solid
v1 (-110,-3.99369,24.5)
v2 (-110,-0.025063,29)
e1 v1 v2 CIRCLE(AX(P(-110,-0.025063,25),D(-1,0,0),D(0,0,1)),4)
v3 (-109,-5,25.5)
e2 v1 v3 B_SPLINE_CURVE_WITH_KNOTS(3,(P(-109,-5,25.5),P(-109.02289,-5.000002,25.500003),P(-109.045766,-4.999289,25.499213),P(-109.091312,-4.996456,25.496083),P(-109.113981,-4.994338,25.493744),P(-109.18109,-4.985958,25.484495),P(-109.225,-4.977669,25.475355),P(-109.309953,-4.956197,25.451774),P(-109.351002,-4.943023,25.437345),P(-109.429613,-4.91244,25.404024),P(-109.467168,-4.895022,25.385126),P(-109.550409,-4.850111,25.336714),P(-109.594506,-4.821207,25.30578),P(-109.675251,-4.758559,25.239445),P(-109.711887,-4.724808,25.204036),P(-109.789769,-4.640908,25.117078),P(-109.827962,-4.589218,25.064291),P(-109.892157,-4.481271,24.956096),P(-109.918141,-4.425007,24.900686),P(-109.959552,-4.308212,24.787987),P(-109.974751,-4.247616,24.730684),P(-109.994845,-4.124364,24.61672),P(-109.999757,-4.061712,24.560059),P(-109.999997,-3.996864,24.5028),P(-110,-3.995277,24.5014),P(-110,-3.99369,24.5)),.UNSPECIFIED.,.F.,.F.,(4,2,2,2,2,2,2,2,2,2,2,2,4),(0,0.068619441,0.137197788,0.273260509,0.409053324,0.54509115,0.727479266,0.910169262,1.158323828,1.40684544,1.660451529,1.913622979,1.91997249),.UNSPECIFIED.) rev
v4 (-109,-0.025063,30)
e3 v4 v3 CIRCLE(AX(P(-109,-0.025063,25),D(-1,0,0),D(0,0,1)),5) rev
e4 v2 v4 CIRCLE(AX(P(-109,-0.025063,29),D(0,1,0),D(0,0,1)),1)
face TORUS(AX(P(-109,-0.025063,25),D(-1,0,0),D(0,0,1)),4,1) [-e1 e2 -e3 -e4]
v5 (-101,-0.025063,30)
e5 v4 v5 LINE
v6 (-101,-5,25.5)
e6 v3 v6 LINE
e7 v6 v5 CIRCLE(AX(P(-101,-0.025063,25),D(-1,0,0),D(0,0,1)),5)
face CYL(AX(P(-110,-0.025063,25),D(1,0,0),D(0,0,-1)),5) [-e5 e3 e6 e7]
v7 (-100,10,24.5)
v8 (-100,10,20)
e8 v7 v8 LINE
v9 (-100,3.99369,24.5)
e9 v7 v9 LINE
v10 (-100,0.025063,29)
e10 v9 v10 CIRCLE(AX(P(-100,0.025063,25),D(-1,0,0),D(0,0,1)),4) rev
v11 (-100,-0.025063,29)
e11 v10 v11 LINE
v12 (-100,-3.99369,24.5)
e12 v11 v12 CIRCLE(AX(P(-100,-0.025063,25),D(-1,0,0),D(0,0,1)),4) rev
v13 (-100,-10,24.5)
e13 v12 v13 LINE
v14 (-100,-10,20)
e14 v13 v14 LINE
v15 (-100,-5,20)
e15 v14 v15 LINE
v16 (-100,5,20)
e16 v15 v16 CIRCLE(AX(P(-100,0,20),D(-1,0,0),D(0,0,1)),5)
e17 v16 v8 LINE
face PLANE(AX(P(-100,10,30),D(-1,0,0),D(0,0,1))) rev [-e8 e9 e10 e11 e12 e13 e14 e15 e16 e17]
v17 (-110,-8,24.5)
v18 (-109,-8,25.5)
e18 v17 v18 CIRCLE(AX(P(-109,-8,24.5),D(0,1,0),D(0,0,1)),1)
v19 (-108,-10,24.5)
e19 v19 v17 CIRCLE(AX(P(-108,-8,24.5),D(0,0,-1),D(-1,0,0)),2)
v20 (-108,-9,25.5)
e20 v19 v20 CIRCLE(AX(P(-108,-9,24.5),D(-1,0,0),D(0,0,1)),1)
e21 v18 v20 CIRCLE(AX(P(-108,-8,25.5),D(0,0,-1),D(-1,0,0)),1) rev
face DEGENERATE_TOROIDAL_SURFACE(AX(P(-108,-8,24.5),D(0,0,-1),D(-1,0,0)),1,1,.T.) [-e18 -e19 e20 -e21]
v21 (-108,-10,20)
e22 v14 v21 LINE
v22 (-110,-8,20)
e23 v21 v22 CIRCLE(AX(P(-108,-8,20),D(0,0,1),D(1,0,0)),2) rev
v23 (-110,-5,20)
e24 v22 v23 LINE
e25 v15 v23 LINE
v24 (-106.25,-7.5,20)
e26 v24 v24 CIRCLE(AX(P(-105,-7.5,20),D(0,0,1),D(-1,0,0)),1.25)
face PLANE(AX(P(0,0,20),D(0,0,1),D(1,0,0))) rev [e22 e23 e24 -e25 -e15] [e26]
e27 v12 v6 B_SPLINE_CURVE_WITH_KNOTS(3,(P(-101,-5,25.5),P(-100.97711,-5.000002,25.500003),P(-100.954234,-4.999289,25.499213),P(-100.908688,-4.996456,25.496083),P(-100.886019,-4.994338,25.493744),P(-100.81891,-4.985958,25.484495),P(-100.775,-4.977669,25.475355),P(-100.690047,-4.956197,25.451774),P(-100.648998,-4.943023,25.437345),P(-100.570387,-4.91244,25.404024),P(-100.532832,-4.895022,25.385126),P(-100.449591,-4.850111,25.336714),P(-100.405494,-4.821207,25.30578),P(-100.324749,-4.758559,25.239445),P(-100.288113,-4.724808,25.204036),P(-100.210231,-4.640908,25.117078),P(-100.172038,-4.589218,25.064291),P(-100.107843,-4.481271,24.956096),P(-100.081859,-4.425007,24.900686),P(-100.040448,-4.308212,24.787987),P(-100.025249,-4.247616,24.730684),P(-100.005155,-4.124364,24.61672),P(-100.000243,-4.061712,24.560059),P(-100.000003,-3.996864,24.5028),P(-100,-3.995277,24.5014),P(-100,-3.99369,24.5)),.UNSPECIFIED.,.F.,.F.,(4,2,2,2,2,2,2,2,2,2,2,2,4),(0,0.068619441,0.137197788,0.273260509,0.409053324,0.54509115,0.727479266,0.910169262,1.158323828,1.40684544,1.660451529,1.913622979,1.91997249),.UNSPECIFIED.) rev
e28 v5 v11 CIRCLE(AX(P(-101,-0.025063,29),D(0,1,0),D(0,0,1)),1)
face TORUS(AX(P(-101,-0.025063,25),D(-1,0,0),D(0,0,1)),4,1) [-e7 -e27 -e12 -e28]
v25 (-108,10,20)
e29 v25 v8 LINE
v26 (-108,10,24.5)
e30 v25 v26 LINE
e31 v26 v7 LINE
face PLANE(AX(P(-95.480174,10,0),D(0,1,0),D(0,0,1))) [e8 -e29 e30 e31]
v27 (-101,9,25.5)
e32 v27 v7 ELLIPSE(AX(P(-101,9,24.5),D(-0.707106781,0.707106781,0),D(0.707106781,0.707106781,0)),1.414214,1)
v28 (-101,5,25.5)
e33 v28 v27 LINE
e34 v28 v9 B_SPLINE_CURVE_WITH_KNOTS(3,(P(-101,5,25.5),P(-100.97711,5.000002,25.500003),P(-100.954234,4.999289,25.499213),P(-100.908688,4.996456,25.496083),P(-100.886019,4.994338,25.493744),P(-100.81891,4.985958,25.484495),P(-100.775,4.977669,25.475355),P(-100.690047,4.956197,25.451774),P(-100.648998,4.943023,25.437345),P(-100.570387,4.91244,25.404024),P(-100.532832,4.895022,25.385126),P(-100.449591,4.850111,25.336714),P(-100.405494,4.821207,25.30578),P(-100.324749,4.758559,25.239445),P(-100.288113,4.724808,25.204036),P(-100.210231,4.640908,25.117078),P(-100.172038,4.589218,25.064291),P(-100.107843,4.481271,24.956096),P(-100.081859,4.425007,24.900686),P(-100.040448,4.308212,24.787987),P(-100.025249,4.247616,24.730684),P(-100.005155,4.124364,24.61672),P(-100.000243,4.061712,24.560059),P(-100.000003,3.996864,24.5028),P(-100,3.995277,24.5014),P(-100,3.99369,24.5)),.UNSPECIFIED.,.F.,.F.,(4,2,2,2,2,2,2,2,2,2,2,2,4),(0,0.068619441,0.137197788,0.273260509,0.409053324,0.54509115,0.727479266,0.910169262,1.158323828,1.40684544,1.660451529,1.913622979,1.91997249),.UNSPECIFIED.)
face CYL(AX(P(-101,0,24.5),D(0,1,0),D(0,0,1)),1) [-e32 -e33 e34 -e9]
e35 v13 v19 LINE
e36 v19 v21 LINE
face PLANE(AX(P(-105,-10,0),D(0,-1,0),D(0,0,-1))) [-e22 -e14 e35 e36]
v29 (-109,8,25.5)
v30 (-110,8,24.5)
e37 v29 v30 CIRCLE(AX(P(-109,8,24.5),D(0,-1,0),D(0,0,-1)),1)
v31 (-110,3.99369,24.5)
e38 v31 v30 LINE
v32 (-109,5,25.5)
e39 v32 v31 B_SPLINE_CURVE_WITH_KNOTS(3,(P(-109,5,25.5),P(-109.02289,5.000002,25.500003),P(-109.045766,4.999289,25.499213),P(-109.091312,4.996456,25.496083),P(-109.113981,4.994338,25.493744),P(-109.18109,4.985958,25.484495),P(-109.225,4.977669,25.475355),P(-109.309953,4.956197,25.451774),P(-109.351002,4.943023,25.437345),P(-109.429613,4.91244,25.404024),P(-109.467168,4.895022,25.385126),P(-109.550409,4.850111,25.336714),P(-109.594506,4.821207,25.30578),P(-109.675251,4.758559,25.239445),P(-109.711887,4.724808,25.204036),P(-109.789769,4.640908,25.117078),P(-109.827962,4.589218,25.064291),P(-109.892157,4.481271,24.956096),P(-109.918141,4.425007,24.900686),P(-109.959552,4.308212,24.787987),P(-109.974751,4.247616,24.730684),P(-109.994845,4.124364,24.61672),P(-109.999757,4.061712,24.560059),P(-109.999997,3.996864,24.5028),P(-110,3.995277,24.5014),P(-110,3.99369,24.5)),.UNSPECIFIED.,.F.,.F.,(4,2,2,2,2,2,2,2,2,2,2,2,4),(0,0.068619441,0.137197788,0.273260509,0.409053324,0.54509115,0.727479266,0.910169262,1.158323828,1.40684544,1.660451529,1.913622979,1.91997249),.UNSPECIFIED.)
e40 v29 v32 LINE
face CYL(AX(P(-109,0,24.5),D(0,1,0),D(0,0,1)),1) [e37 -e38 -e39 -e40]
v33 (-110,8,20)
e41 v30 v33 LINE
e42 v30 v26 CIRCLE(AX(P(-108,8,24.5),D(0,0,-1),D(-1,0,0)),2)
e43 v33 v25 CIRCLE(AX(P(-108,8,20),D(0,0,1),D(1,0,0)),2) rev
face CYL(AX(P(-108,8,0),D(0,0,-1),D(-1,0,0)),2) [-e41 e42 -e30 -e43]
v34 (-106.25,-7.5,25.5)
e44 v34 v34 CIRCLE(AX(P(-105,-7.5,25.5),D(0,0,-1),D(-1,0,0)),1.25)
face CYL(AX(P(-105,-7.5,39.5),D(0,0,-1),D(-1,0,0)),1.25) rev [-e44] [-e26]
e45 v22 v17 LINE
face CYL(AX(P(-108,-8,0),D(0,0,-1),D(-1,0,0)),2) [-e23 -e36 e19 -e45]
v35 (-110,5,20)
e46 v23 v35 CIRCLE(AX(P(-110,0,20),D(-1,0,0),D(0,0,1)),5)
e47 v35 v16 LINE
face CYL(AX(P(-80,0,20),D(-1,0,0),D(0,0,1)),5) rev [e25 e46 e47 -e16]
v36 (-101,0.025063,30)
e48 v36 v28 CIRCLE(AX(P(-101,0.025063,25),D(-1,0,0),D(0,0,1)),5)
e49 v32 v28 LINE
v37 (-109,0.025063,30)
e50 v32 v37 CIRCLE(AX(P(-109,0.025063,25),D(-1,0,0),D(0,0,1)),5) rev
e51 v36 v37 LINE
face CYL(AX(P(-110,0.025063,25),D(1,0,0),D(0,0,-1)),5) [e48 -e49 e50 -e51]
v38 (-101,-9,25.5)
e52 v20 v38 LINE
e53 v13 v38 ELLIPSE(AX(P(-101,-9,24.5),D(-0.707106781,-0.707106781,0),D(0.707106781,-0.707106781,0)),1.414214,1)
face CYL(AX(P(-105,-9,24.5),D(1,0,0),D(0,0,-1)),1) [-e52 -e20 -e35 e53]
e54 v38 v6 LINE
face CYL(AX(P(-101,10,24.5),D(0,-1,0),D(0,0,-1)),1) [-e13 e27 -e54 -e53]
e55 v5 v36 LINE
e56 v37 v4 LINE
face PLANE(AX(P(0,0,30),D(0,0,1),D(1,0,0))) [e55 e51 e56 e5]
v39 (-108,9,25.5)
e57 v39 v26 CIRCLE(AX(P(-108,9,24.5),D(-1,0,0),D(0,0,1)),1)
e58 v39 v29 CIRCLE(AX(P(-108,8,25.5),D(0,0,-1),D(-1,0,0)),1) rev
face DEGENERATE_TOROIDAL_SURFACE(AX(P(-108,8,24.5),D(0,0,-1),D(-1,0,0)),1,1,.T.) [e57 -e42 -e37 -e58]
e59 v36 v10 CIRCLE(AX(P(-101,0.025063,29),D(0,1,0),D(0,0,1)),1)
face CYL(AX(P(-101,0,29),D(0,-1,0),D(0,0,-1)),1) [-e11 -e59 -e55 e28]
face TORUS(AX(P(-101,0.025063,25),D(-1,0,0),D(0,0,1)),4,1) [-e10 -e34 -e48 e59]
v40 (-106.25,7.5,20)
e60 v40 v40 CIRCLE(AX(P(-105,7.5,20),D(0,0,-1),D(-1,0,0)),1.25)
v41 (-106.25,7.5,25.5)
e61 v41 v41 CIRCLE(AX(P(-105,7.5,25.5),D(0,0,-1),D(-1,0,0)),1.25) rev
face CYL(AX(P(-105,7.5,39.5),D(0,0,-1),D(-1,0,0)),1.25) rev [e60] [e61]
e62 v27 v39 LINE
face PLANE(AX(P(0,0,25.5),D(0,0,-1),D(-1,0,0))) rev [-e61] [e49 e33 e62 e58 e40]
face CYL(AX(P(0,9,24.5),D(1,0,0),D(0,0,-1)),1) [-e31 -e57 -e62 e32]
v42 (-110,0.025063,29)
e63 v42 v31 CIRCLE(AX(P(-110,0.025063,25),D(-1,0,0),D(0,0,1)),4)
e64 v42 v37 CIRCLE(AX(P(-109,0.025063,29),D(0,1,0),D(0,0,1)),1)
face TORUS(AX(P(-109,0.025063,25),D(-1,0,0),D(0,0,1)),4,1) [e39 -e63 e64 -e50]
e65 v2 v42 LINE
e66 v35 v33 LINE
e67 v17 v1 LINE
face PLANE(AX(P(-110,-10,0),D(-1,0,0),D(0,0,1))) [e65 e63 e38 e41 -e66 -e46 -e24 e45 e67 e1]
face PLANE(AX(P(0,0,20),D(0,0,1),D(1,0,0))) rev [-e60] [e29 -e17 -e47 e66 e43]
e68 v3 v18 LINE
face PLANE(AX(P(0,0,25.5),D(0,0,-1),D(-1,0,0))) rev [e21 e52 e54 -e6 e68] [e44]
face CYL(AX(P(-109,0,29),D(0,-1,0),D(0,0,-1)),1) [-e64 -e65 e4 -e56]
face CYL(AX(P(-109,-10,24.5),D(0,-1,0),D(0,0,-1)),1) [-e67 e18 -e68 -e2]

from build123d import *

# Parameters (mm, degrees)
SKETCH3_R                 = 2.75
BOSS_EXTRUDE1_DEPTH       = 6
BOSS_EXTRUDE1_2_DEPTH     = 6
BOSS_EXTRUDE1_3_DEPTH     = 6
BOSS_EXTRUDE1_4_DEPTH     = 6
SKETCH4_W                 = 43
SKETCH4_H                 = 86
BOSS_EXTRUDE2_DEPTH       = 2.5
SKETCH5_R                 = 2.75
BOSS_EXTRUDE3_DEPTH       = 10
LPATTERN1_COUNT           = 2
LPATTERN1_PITCH           = 37
LPATTERN2_COUNT           = 2
LPATTERN2_PITCH           = 37
LPATTERN2_COPY_1_SKETCH_R = 2.75
LPATTERN2_COPY_1_DEPTH    = 10
SKETCH6_W                 = 87
SKETCH6_H                 = 86
BOSS_EXTRUDE4_DEPTH       = 2.5
BOSS_EXTRUDE5_DEPTH       = 2
SKETCH12_W                = 4
SKETCH12_H                = 8
CUT_EXTRUDE1_DEPTH        = 4
SKETCH14_R                = 0.85
CUT_EXTRUDE2_DEPTH        = 4.5
LPATTERN3_COUNT           = 2
LPATTERN3_PITCH           = 46.5
BOSS_EXTRUDE6_DEPTH       = 35
SKETCH18_W                = 2
SKETCH18_H                = 35
BOSS_EXTRUDE7_DEPTH       = 18.5
SKETCH19_W                = 32.48
SKETCH19_H                = 17.04
BOSS_EXTRUDE8_DEPTH       = 10
SKETCH20_W                = 8.16
SKETCH20_H                = 13.04
CUT_EXTRUDE3_DEPTH        = 10
SKETCH21_W                = 1.1
SKETCH21_H                = 86
CUT_EXTRUDE4_DEPTH        = 10
FILLET2_R                 = 2
FILLET4_R                 = 20
BOSS_EXTRUDE9_DEPTH       = 2.5
SKETCH24_W                = 10
SKETCH24_H                = 20
BOSS_EXTRUDE10_DEPTH      = 30
SKETCH25_R                = 5
CUT_EXTRUDE6_DEPTH        = 30
FILLET6_R                 = 10
FILLET8_R                 = 2
SKETCH27_W                = 20
SKETCH27_H                = 20.130693805
CUT_EXTRUDE7_DEPTH        = 22.5
CUT_EXTRUDE10_DEPTH       = 7.5
CUT_EXTRUDE10_DEPTH_BACK  = 210.5
SKETCH28_W                = 79.126815109
SKETCH28_H                = 112.332596714
SKETCH29_R                = 1.25
CUT_EXTRUDE11_DEPTH       = 19.5
SKETCH30_W                = 10
SKETCH30_H                = 5
CUT_EXTRUDE12_DEPTH       = 4.5
FILLET9_R                 = 5
FILLET9_OF_MIRROR5_R      = 5
FILLET11_R                = 1


with BuildPart() as part:
    # Sketch3 → Boss-Extrude1 (new body)
    with BuildSketch(Plane.XY):
        with Locations((-25, -3)):
            Circle(SKETCH3_R)
    boss_extrude1 = extrude(amount=BOSS_EXTRUDE1_DEPTH)



with BuildPart() as body_2:
    # Sketch3 → Boss-Extrude1 2 (new body)
    with BuildSketch(Plane.XY):
        with Locations((-62, -3)):
            Circle(SKETCH3_R)
    boss_extrude1_2 = extrude(amount=BOSS_EXTRUDE1_2_DEPTH)


with BuildPart() as body_3:
    # Sketch3 → Boss-Extrude1 3 (new body)
    with BuildSketch(Plane.XY):
        with Locations(Location((-25, -40, 0), (0, 0, 180))):
            Circle(SKETCH3_R)
    boss_extrude1_3 = extrude(amount=BOSS_EXTRUDE1_3_DEPTH)


with BuildPart() as body_4:
    # Sketch3 → Boss-Extrude1 4 (new body)
    with BuildSketch(Plane.XY):
        with Locations(Location((-62, -40, 0), (0, 0, 180))):
            Circle(SKETCH3_R)
    boss_extrude1_4 = extrude(amount=BOSS_EXTRUDE1_4_DEPTH)


with BuildPart() as part_1:
    add(part.part)

    add(body_2.part)  # Boss-Extrude2 merges body 2

    add(body_3.part)  # Boss-Extrude2 merges body 3

    add(body_4.part)  # Boss-Extrude2 merges body 4
    # Sketch4 → Boss-Extrude2 (add)
    with BuildSketch(Plane.XY):
        with Locations((-43.5, 0)):
            Rectangle(SKETCH4_W, SKETCH4_H)
    extrude(amount=-BOSS_EXTRUDE2_DEPTH)

    # Mirror4: Boss-Extrude1, Boss-Extrude1 2, Boss-Extrude1 3, Boss-Extrude1 4 across plane
    add(boss_extrude1.mirror(Plane.ZX))
    add(boss_extrude1_2.mirror(Plane.ZX))
    add(boss_extrude1_3.mirror(Plane.ZX))
    add(boss_extrude1_4.mirror(Plane.ZX))

    # Sketch5 → Boss-Extrude3 (add)
    with BuildSketch(Plane.XY.offset(6)):
        with Locations((-25, 40)):
            Circle(SKETCH5_R)
    boss_extrude3 = extrude(amount=BOSS_EXTRUDE3_DEPTH)

    # LPattern1: Boss-Extrude3 ×2
    with Locations(*[(-i * LPATTERN1_PITCH, 0, 0) for i in range(1, LPATTERN1_COUNT)]):
        add(boss_extrude3)

    # LPattern2: Boss-Extrude3 ×2
    with Locations(*[(0, -i * LPATTERN2_PITCH, 0) for i in range(1, LPATTERN2_COUNT)]):
        add(boss_extrude3)

    # LPattern2 copy 1 sketch → LPattern2 copy 1 (add)
    with BuildSketch(Plane(origin=(-37, -37, 6), x_dir=(1, 0, 0), z_dir=(0, 0, 1))):
        with Locations((-25, 40)):
            Circle(LPATTERN2_COPY_1_SKETCH_R)
    extrude(amount=LPATTERN2_COPY_1_DEPTH)

    # Sketch6 → Boss-Extrude4 (add)
    with BuildSketch(Plane.XY):
        with Locations((21.5, 0)):
            Rectangle(SKETCH6_W, SKETCH6_H)
    extrude(amount=-BOSS_EXTRUDE4_DEPTH)

    # Sketch11 → Boss-Extrude5 (add, symmetric)
    with BuildSketch(Plane(origin=(-6, 0, 0), x_dir=(0, 0, -1), z_dir=(1, 0, 0))):
        Polygon((0, -43), (-40, -43), (-40, -39), (0, -18), align=None)
    boss_extrude5 = extrude(amount=BOSS_EXTRUDE5_DEPTH, both=True)

    # Sketch12 → Cut-Extrude1 (cut)
    with BuildSketch(Plane.ZY.offset(8)):
        with Locations((8, -32)):
            Rectangle(SKETCH12_W, SKETCH12_H)
    extrude(amount=-CUT_EXTRUDE1_DEPTH, mode=Mode.SUBTRACT)

    # Sketch14 → Cut-Extrude2 (cut)
    with BuildSketch(Plane.XZ.offset(43)):
        with Locations(Location((-6, 37, 0), (0, 0, 270))):
            Circle(SKETCH14_R)
        with Locations(Location((-6, 13.6, 0), (0, 0, 270))):
            Circle(SKETCH14_R)
    cut_extrude2 = extrude(amount=-CUT_EXTRUDE2_DEPTH, mode=Mode.SUBTRACT)

    # LPattern3: Boss-Extrude5, Cut-Extrude2 ×2
    with Locations(*[(i * LPATTERN3_PITCH, 0, 0) for i in range(1, LPATTERN3_COUNT)]):
        add(boss_extrude5)
        add(cut_extrude2, mode=Mode.SUBTRACT)

    # Sketch17 → Boss-Extrude6 (add)
    with BuildSketch(Plane.XY):
        Polygon((42.5, -41), (42.5, -43), (63.9, -43), (63.9, 25.4), (40.5, 25.4), (40.5, -18), (42.5, -18), (42.5, 23.4), (61.9, 23.4), (61.9, -41), align=None)
    extrude(amount=BOSS_EXTRUDE6_DEPTH)

    # Sketch18 → Boss-Extrude7 (add)
    with BuildSketch(Plane.XZ.offset(18)):
        with Locations((41.5, 17.5)):
            Rectangle(SKETCH18_W, SKETCH18_H)
    extrude(amount=BOSS_EXTRUDE7_DEPTH)

    # Sketch19 → Boss-Extrude8 (add)
    with BuildSketch(Plane.XY):
        with Locations((16.24, 8.52)):
            Rectangle(SKETCH19_W, SKETCH19_H)
    extrude(amount=BOSS_EXTRUDE8_DEPTH)

    # Sketch20 → Cut-Extrude3 (cut)
    with BuildSketch(Plane.XY.offset(10)):
        with Locations((6.08, 8.52)):
            Rectangle(SKETCH20_W, SKETCH20_H)
        with Locations((16.24, 8.52)):
            Rectangle(SKETCH20_W, SKETCH20_H)
        with Locations((26.4, 8.52)):
            Rectangle(SKETCH20_W, SKETCH20_H)
    extrude(amount=-CUT_EXTRUDE3_DEPTH, mode=Mode.SUBTRACT)

    # Sketch21 → Cut-Extrude4 (cut)
    with BuildSketch(Plane.XY):
        with Locations((64.45, 0)):
            Rectangle(SKETCH21_W, SKETCH21_H)
    extrude(amount=-CUT_EXTRUDE4_DEPTH, mode=Mode.SUBTRACT)

    # Fillet2
    fillet2_edges = [part_1.edges().sort_by_distance(p)[0] for p in [
        (63.9, -43, 16.25),
        (63.9, 25.4, 17.5),
        (-65, -43, -1.25),
        (-65, 43, -1.25),
    ]]
    fillet(fillet2_edges, radius=FILLET2_R)

    # Fillet4
    fillet4_edges = [part_1.edges().sort_by_distance(p)[0] for p in [
        (63.9, 43, -1.25),
    ]]
    fillet(fillet4_edges, radius=FILLET4_R)

    # Sketch23 → Boss-Extrude9 (add)
    with BuildSketch(Plane(origin=(0, 0, -2.5), x_dir=(-1, 0, 0), z_dir=(0, 0, -1))):
        with BuildLine():
            Line((95.480174176, -10), (105, -10))
            Line((105, -10), (110, -10))
            Line((110, -10), (110, 10))
            Line((110, 10), (105, 10))
            Line((105, 10), (95.480174176, 10))
            add(Edge.make_bspline(
                [(95.480174176, 10), (68.262963787, 8.86232235), (65, 41)],
                knots=[0, 0, 0, 1, 1, 1], degree=2))
            Line((65, 41), (65, -41))
            add(Edge.make_bspline(
                [(95.480174176, -10), (68.262963787, -8.86232235), (65, -41)],
                knots=[0, 0, 0, 1, 1, 1], degree=2))
        make_face()
    extrude(amount=-BOSS_EXTRUDE9_DEPTH)

    # Sketch24 → Boss-Extrude10 (add)
    with BuildSketch(Plane.XY):
        with Locations((-105, 0)):
            Rectangle(SKETCH24_W, SKETCH24_H)
    extrude(amount=BOSS_EXTRUDE10_DEPTH)

    # Sketch25 → Cut-Extrude6 (cut)
    with BuildSketch(Plane.ZY.offset(110)):
        with Locations((20, 0)):
            Circle(SKETCH25_R)
    extrude(amount=-CUT_EXTRUDE6_DEPTH, mode=Mode.SUBTRACT)

    # Fillet6
    fillet6_edges = [part_1.edges().sort_by_distance(p)[0] for p in [
        (-100, 0, 0),
    ]]
    fillet(fillet6_edges, radius=FILLET6_R)

    # Fillet8
    fillet8_edges = [part_1.edges().sort_by_distance(p)[0] for p in [
        (-110, 10, 15),
        (-110, -10, 15),
    ]]
    fillet(fillet8_edges, radius=FILLET8_R)

    # Sketch27 → Cut-Extrude7 (cut)
    with BuildSketch(Plane(origin=(0, 0, -2.5), x_dir=(-1, 0, 0), z_dir=(0, 0, -1))):
        with Locations((100, -0.065346902)):
            Rectangle(SKETCH27_W, SKETCH27_H)
    extrude(amount=-CUT_EXTRUDE7_DEPTH, mode=Mode.SUBTRACT)


with BuildPart() as cut_extrude7_piece_1:
    # of the separate pieces the step leaves, piece 1, a body of its own (cut_extrude7_pieces)
    add(part_1.part.solids().sort_by_distance((-90, -10.130693805, -2.5))[0])

    # Sketch28 → Cut-Extrude10 (cut, two sides: drawn at the far end of the back side and taken through both)
    with BuildSketch(Plane.ZY.offset(90).offset(-CUT_EXTRUDE10_DEPTH_BACK)):
        with Locations((27.34304702, -0.64713832)):
            Rectangle(SKETCH28_W, SKETCH28_H)
    extrude(amount=CUT_EXTRUDE10_DEPTH + CUT_EXTRUDE10_DEPTH_BACK, mode=Mode.SUBTRACT)


with BuildPart() as cut_extrude7_piece_2:
    # of the separate pieces the step leaves, piece 2, a body of its own (cut_extrude7_pieces)
    add(part_1.part.solids().sort_by_distance((-108, 10, 20))[0])

    # Sketch29 → Cut-Extrude11 (cut)
    with BuildSketch(Plane(origin=(0, 0, 20), x_dir=(-1, 0, 0), z_dir=(0, 0, -1))):
        with Locations((105, 7.5)):
            Circle(SKETCH29_R)
    cut_extrude11 = extrude(amount=-CUT_EXTRUDE11_DEPTH, mode=Mode.SUBTRACT)

    # Sketch30 → Cut-Extrude12 (cut)
    with BuildSketch(Plane.XY.offset(30)):
        with Locations((-105, 7.5)):
            Rectangle(SKETCH30_W, SKETCH30_H)
    cut_extrude12 = extrude(amount=-CUT_EXTRUDE12_DEPTH, mode=Mode.SUBTRACT)

    # Fillet9
    # the kernel refuses this fillet: 5 mm, written as the material it takes off along each edge
    with BuildSketch(Plane(origin=(-122.437342964, 5, 30), x_dir=(0, -1, 0), z_dir=(1, 0, 0))) as fillet9_piece_1:
        with BuildLine():
            CenterArc((4.974937186, 5), FILLET9_R, 185.739170477, 84.260829523)
            Line((0, 4.5), (-0.099498744, 4.49))
            ThreePointArc((-0.099498744, 4.49), (-0.1, 2.25), (-0.1, 0))
            Line((-0.1, 0), (0, -0.1))
            Line((0, -0.1), (4.974937186, -0.1))
            Line((4.974937186, -0.1), (4.974937186, 0))
        make_face()
    extrude(amount=34.874685928, mode=Mode.SUBTRACT)

    # Mirror5: Cut-Extrude11, Cut-Extrude12 across plane
    add(cut_extrude11.mirror(Plane.ZX), mode=Mode.SUBTRACT)
    add(cut_extrude12.mirror(Plane.ZX), mode=Mode.SUBTRACT)

    # Fillet9 of Mirror5
    # the kernel refuses this fillet: 5 mm, written as the material it takes off along each edge
    with BuildSketch(Plane(origin=(-122.437342964, -5, 30), x_dir=(0, 0, -1), z_dir=(1, 0, 0))) as fillet9_of_mirror5_piece_1:
        with BuildLine():
            CenterArc((5, 4.974937186), FILLET9_OF_MIRROR5_R, 180, 84.260829523)
            Line((0, 4.974937186), (-0.1, 4.974937186))
            Line((-0.1, 4.974937186), (-0.1, 0))
            Line((-0.1, 0), (0, -0.1))
            ThreePointArc((0, -0.1), (2.25, -0.1), (4.49, -0.099498744))
            Line((4.49, -0.099498744), (4.5, 0))
        make_face()
    extrude(amount=34.874685928, mode=Mode.SUBTRACT)

    # Fillet11
    fillet11_edges = [cut_extrude7_piece_2.edges().sort_by_distance(p)[0] for p in [
        (-104, 10, 25.5),
        (-109.414213562, 9.414213562, 25.5),
        (-110, 6.5, 25.5),
        (-100, 7.5, 25.5),
        (-100, 3.379164781, 28.708099244),
        (-110, 0, 30),
        (-110, 3.379164781, 28.708099244),
        (-109.414213562, -9.414213562, 25.5),
        (-110, -6.5, 25.5),
        (-100, -7.5, 25.5),
        (-104, -10, 25.5),
        (-100, 0, 30),
        (-100, -3.379164781, 28.708099244),
        (-110, -3.379164781, 28.708099244),
    ]]
    fillet(fillet11_edges, radius=FILLET11_R)


solid = cut_extrude7_piece_2.part
